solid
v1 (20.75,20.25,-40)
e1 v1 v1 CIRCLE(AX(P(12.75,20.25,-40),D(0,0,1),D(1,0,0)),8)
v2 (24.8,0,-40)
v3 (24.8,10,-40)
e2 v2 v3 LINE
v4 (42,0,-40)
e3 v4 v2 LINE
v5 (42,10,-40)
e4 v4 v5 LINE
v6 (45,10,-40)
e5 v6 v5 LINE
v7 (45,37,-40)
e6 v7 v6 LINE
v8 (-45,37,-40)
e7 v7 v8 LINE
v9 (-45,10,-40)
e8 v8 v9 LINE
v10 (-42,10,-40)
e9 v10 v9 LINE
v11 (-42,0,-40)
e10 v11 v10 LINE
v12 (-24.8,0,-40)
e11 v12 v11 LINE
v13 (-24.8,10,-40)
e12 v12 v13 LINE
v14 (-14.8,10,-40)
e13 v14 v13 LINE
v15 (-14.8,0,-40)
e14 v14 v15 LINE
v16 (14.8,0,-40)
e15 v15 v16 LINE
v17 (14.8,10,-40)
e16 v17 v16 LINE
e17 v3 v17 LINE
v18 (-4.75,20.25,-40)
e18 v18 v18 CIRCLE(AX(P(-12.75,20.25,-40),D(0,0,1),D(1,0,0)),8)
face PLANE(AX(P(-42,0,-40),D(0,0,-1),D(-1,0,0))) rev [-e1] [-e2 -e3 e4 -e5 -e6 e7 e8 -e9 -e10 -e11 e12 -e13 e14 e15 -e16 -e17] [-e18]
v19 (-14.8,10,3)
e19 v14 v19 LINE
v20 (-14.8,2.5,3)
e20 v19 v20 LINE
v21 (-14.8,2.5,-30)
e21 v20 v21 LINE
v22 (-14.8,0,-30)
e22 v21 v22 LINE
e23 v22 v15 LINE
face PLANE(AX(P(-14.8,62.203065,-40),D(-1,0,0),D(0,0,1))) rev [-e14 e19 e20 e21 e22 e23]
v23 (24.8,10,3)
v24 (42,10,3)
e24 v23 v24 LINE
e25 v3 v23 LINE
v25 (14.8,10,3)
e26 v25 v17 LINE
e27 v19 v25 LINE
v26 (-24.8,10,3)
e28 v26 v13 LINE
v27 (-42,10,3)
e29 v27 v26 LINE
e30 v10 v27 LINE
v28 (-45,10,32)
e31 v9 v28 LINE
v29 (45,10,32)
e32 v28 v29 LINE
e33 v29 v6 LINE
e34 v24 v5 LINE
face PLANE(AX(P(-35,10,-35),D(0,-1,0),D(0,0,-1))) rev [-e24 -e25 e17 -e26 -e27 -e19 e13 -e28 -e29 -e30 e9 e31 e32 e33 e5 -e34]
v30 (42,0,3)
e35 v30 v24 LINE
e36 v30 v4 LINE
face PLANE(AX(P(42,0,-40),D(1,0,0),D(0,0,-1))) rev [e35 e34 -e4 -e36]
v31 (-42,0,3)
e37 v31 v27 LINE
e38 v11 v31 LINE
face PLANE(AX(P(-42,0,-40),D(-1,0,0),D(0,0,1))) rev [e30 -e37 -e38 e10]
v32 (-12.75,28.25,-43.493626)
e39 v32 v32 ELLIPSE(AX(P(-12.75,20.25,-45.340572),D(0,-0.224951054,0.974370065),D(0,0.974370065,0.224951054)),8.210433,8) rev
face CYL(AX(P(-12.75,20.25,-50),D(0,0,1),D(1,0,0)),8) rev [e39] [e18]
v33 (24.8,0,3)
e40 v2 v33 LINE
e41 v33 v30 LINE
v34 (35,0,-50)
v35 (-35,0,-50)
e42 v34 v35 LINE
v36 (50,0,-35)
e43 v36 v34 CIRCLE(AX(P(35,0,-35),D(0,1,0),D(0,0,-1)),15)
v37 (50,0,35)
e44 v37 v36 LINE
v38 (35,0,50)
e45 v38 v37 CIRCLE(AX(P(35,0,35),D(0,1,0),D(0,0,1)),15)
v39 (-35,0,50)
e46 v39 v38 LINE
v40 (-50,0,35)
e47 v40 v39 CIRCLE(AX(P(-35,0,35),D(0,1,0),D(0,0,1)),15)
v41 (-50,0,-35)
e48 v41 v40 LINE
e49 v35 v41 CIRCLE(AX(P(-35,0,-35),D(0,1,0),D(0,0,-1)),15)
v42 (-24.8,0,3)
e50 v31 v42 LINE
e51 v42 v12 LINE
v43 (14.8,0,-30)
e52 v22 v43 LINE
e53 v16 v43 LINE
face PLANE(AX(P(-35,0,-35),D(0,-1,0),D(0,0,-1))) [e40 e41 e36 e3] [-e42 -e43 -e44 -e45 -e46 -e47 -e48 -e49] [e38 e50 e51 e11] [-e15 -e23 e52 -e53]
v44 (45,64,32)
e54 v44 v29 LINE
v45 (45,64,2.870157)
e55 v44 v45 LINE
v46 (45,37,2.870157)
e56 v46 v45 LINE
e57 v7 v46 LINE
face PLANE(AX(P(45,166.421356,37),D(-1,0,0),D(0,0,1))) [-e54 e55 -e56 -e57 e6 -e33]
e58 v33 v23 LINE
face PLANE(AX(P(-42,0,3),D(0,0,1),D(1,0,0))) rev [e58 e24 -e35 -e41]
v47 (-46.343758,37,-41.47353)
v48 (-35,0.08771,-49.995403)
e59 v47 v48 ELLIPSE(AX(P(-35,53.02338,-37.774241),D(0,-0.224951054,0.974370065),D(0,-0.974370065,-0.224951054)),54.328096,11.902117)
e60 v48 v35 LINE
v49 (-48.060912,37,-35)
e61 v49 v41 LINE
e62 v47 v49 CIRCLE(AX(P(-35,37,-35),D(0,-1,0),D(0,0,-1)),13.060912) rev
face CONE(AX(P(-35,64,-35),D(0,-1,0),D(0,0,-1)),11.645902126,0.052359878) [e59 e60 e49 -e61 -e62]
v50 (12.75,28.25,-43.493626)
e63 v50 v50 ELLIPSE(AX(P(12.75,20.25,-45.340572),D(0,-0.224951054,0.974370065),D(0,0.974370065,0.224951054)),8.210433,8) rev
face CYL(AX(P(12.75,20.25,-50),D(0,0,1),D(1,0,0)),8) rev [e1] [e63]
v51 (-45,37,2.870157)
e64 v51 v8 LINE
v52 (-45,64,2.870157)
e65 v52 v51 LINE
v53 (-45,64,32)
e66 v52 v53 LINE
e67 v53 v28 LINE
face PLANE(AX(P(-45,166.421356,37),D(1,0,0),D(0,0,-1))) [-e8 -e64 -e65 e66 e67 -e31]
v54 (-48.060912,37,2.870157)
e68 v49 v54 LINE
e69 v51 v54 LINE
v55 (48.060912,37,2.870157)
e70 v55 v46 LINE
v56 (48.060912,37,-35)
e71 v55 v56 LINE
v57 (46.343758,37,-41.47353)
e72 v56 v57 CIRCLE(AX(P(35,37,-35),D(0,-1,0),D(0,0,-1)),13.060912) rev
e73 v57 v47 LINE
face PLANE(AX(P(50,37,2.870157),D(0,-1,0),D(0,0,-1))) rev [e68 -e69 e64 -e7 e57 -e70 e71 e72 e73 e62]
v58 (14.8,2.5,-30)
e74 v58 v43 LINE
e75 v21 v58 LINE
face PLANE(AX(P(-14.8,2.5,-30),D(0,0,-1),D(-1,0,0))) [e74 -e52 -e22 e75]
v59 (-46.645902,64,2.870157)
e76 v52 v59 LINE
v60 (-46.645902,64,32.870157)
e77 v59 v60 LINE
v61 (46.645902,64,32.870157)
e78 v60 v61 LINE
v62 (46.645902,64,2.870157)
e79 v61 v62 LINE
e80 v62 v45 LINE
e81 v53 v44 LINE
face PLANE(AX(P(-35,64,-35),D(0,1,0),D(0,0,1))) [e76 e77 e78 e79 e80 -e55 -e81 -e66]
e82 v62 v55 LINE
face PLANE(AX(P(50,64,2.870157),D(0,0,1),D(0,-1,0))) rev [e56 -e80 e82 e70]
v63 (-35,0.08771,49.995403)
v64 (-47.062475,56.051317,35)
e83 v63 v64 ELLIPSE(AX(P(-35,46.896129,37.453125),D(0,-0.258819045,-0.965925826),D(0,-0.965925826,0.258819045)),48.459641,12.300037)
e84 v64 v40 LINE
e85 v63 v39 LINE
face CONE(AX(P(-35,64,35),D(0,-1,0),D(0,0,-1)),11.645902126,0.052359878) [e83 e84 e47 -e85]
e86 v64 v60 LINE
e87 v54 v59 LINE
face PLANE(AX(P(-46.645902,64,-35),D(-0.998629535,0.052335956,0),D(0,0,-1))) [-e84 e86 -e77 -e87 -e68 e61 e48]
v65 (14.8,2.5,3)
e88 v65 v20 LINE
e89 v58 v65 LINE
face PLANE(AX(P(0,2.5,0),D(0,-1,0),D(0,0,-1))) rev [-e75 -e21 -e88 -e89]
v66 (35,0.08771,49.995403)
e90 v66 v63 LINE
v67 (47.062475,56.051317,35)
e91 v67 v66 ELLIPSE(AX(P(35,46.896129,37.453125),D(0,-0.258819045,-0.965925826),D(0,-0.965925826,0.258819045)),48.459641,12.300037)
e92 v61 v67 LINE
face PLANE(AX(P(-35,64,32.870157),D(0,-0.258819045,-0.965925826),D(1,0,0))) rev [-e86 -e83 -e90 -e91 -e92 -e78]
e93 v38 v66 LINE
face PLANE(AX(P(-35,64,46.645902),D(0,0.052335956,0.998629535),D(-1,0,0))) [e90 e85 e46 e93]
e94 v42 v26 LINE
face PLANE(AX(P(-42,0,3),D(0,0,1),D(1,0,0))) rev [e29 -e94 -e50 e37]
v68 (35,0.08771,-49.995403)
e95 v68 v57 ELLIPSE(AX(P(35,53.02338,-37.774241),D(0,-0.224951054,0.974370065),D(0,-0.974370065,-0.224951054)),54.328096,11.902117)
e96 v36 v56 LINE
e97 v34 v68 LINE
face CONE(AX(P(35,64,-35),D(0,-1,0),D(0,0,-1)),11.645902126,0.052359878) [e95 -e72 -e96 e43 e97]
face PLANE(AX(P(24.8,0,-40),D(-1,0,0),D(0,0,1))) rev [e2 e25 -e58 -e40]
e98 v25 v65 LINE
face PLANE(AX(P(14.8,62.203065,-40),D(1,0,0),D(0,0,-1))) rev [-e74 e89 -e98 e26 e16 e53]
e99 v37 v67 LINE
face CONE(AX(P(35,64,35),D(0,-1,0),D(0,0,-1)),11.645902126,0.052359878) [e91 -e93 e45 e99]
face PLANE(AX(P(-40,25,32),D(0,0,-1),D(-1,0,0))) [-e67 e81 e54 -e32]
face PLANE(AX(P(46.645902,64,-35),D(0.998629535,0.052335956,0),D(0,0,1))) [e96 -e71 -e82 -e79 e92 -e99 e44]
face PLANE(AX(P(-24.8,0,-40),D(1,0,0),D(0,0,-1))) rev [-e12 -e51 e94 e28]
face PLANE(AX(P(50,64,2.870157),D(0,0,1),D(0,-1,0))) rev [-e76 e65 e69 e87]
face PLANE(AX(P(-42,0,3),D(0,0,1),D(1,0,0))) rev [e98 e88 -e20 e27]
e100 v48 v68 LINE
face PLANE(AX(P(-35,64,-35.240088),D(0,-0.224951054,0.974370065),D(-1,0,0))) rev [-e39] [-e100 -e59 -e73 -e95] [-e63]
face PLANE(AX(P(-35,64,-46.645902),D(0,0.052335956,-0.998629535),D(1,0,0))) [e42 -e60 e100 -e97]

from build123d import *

# Parameters (mm, degrees)
BOSS_EXTRUDE1_DEPTH     = 10
SKETCH2_W               = 17.2
SKETCH2_H               = 43
CUT_EXTRUDE1_DEPTH      = 72.414284285
SKETCH3_W               = 90
SKETCH3_H               = 34
SKETCH3_W_2             = 80
SKETCH3_H_2             = 24
BOSS_EXTRUDE3_DEPTH     = 15
SKETCH4_W               = 49.6
SKETCH4_H               = 5
BOSS_EXTRUDE4_DEPTH     = 10
SKETCH5_W               = 15
SKETCH5_H               = 22
BOSS_EXTRUDE5_DEPTH     = 5
SKETCH6_W               = 90
SKETCH6_H               = 77
BOSS_EXTRUDE6_DEPTH     = 15
BOSS_EXTRUDE8_DEPTH     = 39
CHAMFER1_SIZE           = 64
CHAMFER1_SIZE_2         = 3.354097874
CHAMFER2_SIZE           = 64
CHAMFER2_SIZE_2         = 11.405813635
CHAMFER3_SIZE           = 64
CHAMFER3_SIZE_2         = 13.775745352
CUT_EXTRUDE3_DEPTH      = 95.500525601
CUT_EXTRUDE3_DEPTH_BACK = 95.500525601
SKETCH10_W              = 50
SKETCH10_H              = 27
SKETCH15_R              = 8
CUT_EXTRUDE5_DEPTH      = 122.227059686
CUT_EXTRUDE6_DEPTH      = 2.5
SKETCH18_W              = 29.6
SKETCH18_H              = 43
CUT_EXTRUDE7_DEPTH      = 10
CUT_EXTRUDE8_DEPTH      = 15
SKETCH21_W              = 29.6
SKETCH21_H              = 33
BOSS_EXTRUDE10_DEPTH    = 2.5
SKETCH23_W              = 2.05
SKETCH23_H              = 13
BOSS_EXTRUDE11_DEPTH    = 15
SKETCH24_W              = 90
SKETCH24_H              = 72
CUT_EXTRUDE9_DEPTH      = 54


with BuildPart() as part:
    # Sketch1 → Boss-Extrude1 (new body)
    with BuildSketch(Plane(origin=(0, 0, 0), x_dir=(1, 0, 0), z_dir=(0, 1, 0))):
        with BuildLine():
            Line((-35, 50), (35, 50))
            ThreePointArc((35, 50), (45.606601718, 45.606601718), (50, 35))
            Line((50, 35), (50, -35))
            ThreePointArc((50, -35), (45.606601718, -45.606601718), (35, -50))
            Line((35, -50), (-35, -50))
            ThreePointArc((-35, -50), (-45.606601718, -45.606601718), (-50, -35))
            Line((-50, -35), (-50, 35))
            ThreePointArc((-50, 35), (-45.606601718, 45.606601718), (-35, 50))
        make_face()
    extrude(amount=BOSS_EXTRUDE1_DEPTH)

    # Sketch2 → Cut-Extrude1 (cut, through all)
    with BuildSketch(Plane(origin=(0, 10, 0), x_dir=(1, 0, 0), z_dir=(0, 1, 0))):
        with Locations((-33.4, 18.5)):
            Rectangle(SKETCH2_W, SKETCH2_H)
        with Locations((33.4, 18.5)):
            Rectangle(SKETCH2_W, SKETCH2_H)
    extrude(amount=-CUT_EXTRUDE1_DEPTH, mode=Mode.SUBTRACT)

    # Sketch3 → Boss-Extrude3 (add)
    with BuildSketch(Plane(origin=(0, 10, 0), x_dir=(1, 0, 0), z_dir=(0, 1, 0))):
        with Locations((0, -20)):
            Rectangle(SKETCH3_W, SKETCH3_H)
        with Locations((0, -20)):
            Rectangle(SKETCH3_W_2, SKETCH3_H_2, mode=Mode.SUBTRACT)
    extrude(amount=BOSS_EXTRUDE3_DEPTH)

    # Sketch4 → Boss-Extrude4 (add)
    with BuildSketch(Plane(origin=(0, 10, 0), x_dir=(1, 0, 0), z_dir=(0, 1, 0))):
        with Locations((0, 10)):
            Rectangle(SKETCH4_W, SKETCH4_H)
        with Locations((0, 27)):
            Rectangle(SKETCH4_W, SKETCH4_H)
    extrude(amount=BOSS_EXTRUDE4_DEPTH)

    # Sketch5 → Boss-Extrude5 (add)
    with BuildSketch(Plane(origin=(0, 20, 0), x_dir=(1, 0, 0), z_dir=(0, 1, 0))):
        with Locations((-17.3, 18.5)):
            Rectangle(SKETCH5_W, SKETCH5_H)
        with Locations((17.3, 18.5)):
            Rectangle(SKETCH5_W, SKETCH5_H)
    extrude(amount=BOSS_EXTRUDE5_DEPTH)

    # Sketch6 → Boss-Extrude6 (add)
    with BuildSketch(Plane(origin=(0, 10, 0), x_dir=(1, 0, 0), z_dir=(0, 1, 0))):
        with BuildLine():
            Line((-50, 35), (-50, -35))
            ThreePointArc((-50, -35), (-45.606601718, -45.606601718), (-35, -50))
            Line((-35, -50), (35, -50))
            ThreePointArc((35, -50), (45.606601718, -45.606601718), (50, -35))
            Line((50, -35), (50, 35))
            ThreePointArc((50, 35), (45.606601718, 45.606601718), (35, 50))
            Line((35, 50), (-35, 50))
            ThreePointArc((-35, 50), (-45.606601718, 45.606601718), (-50, 35))
        make_face()
        with Locations((0, 1.5)):
            Rectangle(SKETCH6_W, SKETCH6_H, mode=Mode.SUBTRACT)
    extrude(amount=BOSS_EXTRUDE6_DEPTH)

    # Sketch9 → Boss-Extrude8 (add)
    with BuildSketch(Plane(origin=(0, 25, 0), x_dir=(1, 0, 0), z_dir=(0, 1, 0))):
        with BuildLine():
            Line((-50, 35), (-50, -35))
            ThreePointArc((-50, -35), (-45.606601718, -45.606601718), (-35, -50))
            Line((-35, -50), (35, -50))
            ThreePointArc((35, -50), (45.606601718, -45.606601718), (50, -35))
            Line((50, -35), (50, 35))
            ThreePointArc((50, 35), (45.606601718, 45.606601718), (35, 50))
            Line((35, 50), (-35, 50))
            ThreePointArc((-35, 50), (-45.606601718, 45.606601718), (-50, 35))
        make_face()
        with BuildLine():
            Line((-45, 35), (-45, -32))
            Line((-45, -32), (45, -32))
            Line((45, -32), (45, 35))
            ThreePointArc((45, 35), (44.659258263, 37.588190451), (43.660254038, 40))
            Line((43.660254038, 40), (-43.660254038, 40))
            ThreePointArc((-43.660254038, 40), (-44.659258263, 37.588190451), (-45, 35))
        make_face(mode=Mode.SUBTRACT)
    extrude(amount=BOSS_EXTRUDE8_DEPTH)

    # Chamfer1
    # the kernel refuses this chamfer: 64, 3.354097874 mm, written as the material it takes off along each edge
    with BuildSketch(Plane(origin=(-35, 64, 50), x_dir=(0, -0.9999979738662979, 0.002013023422382214), z_dir=(1, 0, 0)), Plane(origin=(50, 64, 35), x_dir=(0.002013023422382214, -0.9999979738662979, 0), z_dir=(0, 0, -1)), Plane(origin=(-50, 64, -35), x_dir=(-0.002013023422382214, -0.9999979738662979, 0), z_dir=(0, 0, 1)), Plane(origin=(35, 64, -50), x_dir=(0, -0.9999979738662979, -0.002013023422382214), z_dir=(-1, 0, 0))) as chamfer1_piece_1:
        Polygon((CHAMFER1_SIZE * 0.999997973866, CHAMFER1_SIZE * 0.00201302342238), (-CHAMFER1_SIZE_2 * 0.00201302342245, CHAMFER1_SIZE_2 * 0.9999979739), (0, 0), align=None)
    extrude(amount=70, mode=Mode.SUBTRACT)
    with BuildSketch(Plane(origin=(35, 64, 35), x_dir=(0, 0, 1), z_dir=(-1, 0, 0))) as chamfer1_piece_2:
        Polygon((15, -CHAMFER1_SIZE), (15 - CHAMFER1_SIZE_2, 0), (15, 0), align=None)
    revolve(axis=Axis((35, 64, 35), (0, 1, 0)), revolution_arc=90, mode=Mode.SUBTRACT)
    with BuildSketch(Plane(origin=(-35, 64, 35), x_dir=(-1, 0, 0), z_dir=(0, 0, -1))) as chamfer1_piece_3:
        Polygon((15, -CHAMFER1_SIZE), (15 - CHAMFER1_SIZE_2, 0), (15, 0), align=None)
    revolve(axis=Axis((-35, 64, 35), (0, 1, 0)), revolution_arc=90, mode=Mode.SUBTRACT)
    with BuildSketch(Plane(origin=(35, 64, -35), x_dir=(1, 0, 0), z_dir=(0, 0, 1))) as chamfer1_piece_4:
        Polygon((15, -CHAMFER1_SIZE), (15 - CHAMFER1_SIZE_2, 0), (15, 0), align=None)
    revolve(axis=Axis((35, 64, -35), (0, 1, 0)), revolution_arc=90, mode=Mode.SUBTRACT)
    with BuildSketch(Plane(origin=(-35, 64, -35), x_dir=(0, 0, -1), z_dir=(1, 0, 0))) as chamfer1_piece_5:
        Polygon((15 - CHAMFER1_SIZE_2, 0), (15, -CHAMFER1_SIZE), (15, 0), align=None)
    revolve(axis=Axis((-35, 64, -35), (0, 1, 0)), revolution_arc=90, mode=Mode.SUBTRACT)

    # Chamfer2
    # the kernel refuses this chamfer: 64, 11.405813635 mm, written as the material it takes off along each edge
    with BuildSketch(Plane(origin=(201.306482971, 64, -46.645902126), x_dir=(0, -0.9982575003065525, -0.05900816114499234), z_dir=(-1, 0, 0))) as chamfer2_piece_1:
        Polygon((CHAMFER2_SIZE * 0.999977671636, CHAMFER2_SIZE * 0.0066825316561), (-CHAMFER2_SIZE_2 * 0.0590081611462, CHAMFER2_SIZE_2 * 0.998257500326), (0, 0), align=None)
    extrude(amount=402.612965942, mode=Mode.SUBTRACT)

    # Chamfer3
    # the kernel refuses this chamfer: 64, 13.775745352 mm, written as the material it takes off along each edge
    with BuildSketch(Plane(origin=(-201.265469314, 64, 46.645902126), x_dir=(0, -0.9981787050157903, 0.06032638604292662), z_dir=(1, 0, 0))) as chamfer3_piece_1:
        Polygon((CHAMFER3_SIZE * 0.999967974892, CHAMFER3_SIZE * 0.00800307379952), (-CHAMFER3_SIZE_2 * 0.060326386045, CHAMFER3_SIZE_2 * 0.99817870505), (0, 0), align=None)
    extrude(amount=402.530938629, mode=Mode.SUBTRACT)

    # Sketch10 → Cut-Extrude3 (cut, two sides: drawn at the far end of the back side and taken through both)
    with BuildSketch(Plane(origin=(0, 1.307501734, 0), x_dir=(0, 0, 1), z_dir=(-1, 0, 0)).offset(-CUT_EXTRUDE3_DEPTH_BACK)):
        with Locations((-22.129843227, 49.192498266)):
            Rectangle(SKETCH10_W, SKETCH10_H)
    extrude(amount=CUT_EXTRUDE3_DEPTH + CUT_EXTRUDE3_DEPTH_BACK, mode=Mode.SUBTRACT)

    # Sketch15 → Cut-Extrude5 (cut, through all)
    with BuildSketch(Plane.XY.offset(-40)):
        with Locations((-12.75, 20.25)):
            Circle(SKETCH15_R)
        with Locations((12.75, 20.25)):
            Circle(SKETCH15_R)
    extrude(amount=-CUT_EXTRUDE5_DEPTH, mode=Mode.SUBTRACT)

    # Sketch17 → Cut-Extrude6 (cut)
    with BuildSketch(Plane(origin=(0, 0, -29.5), x_dir=(-1, 0, 0), z_dir=(0, 0, -1))):
        Polygon((-24.8, 10), (24.8, 10), (24.8, 25), (9.8, 25), (9.8, 20), (-9.8, 20), (-9.8, 25), (-24.8, 25), align=None)
    extrude(amount=-CUT_EXTRUDE6_DEPTH, mode=Mode.SUBTRACT)

    # Sketch18 → Cut-Extrude7 (cut)
    with BuildSketch(Plane.XZ):
        with Locations((0, -18.5)):
            Rectangle(SKETCH18_W, SKETCH18_H)
    extrude(amount=-CUT_EXTRUDE7_DEPTH, mode=Mode.SUBTRACT)

    # Sketch20 → Cut-Extrude8 (cut)
    with BuildSketch(Plane.XZ.offset(-25)):
        with BuildLine():
            Line((-45, -35), (-45, -40))
            Line((-45, -40), (-43.660254038, -40))
            ThreePointArc((-43.660254038, -40), (-44.659258263, -37.588190451), (-45, -35))
        make_face()
        with BuildLine():
            Line((45, -40), (45, -35))
            ThreePointArc((45, -35), (44.659258263, -37.588190451), (43.660254038, -40))
            Line((43.660254038, -40), (45, -40))
        make_face()
    extrude(amount=-CUT_EXTRUDE8_DEPTH, mode=Mode.SUBTRACT)

    # Sketch21 → Boss-Extrude10 (add)
    with BuildSketch(Plane.XZ):
        with Locations((0, -13.5)):
            Rectangle(SKETCH21_W, SKETCH21_H)
    extrude(amount=-BOSS_EXTRUDE10_DEPTH)

    # Sketch23 → Boss-Extrude11 (add)
    with BuildSketch(Plane(origin=(0, 10, 0), x_dir=(1, 0, 0), z_dir=(0, 1, 0))):
        with Locations((-23.775, 33.5)):
            Rectangle(SKETCH23_W, SKETCH23_H)
        with Locations((23.775, 33.5)):
            Rectangle(SKETCH23_W, SKETCH23_H)
    extrude(amount=BOSS_EXTRUDE11_DEPTH)

    # Sketch24 → Cut-Extrude9 (cut)
    with BuildSketch(Plane(origin=(0, 64, 0), x_dir=(1, 0, 0), z_dir=(0, 1, 0))):
        with Locations((0, 4)):
            Rectangle(SKETCH24_W, SKETCH24_H)
    extrude(amount=-CUT_EXTRUDE9_DEPTH, mode=Mode.SUBTRACT)


solid = part.part
